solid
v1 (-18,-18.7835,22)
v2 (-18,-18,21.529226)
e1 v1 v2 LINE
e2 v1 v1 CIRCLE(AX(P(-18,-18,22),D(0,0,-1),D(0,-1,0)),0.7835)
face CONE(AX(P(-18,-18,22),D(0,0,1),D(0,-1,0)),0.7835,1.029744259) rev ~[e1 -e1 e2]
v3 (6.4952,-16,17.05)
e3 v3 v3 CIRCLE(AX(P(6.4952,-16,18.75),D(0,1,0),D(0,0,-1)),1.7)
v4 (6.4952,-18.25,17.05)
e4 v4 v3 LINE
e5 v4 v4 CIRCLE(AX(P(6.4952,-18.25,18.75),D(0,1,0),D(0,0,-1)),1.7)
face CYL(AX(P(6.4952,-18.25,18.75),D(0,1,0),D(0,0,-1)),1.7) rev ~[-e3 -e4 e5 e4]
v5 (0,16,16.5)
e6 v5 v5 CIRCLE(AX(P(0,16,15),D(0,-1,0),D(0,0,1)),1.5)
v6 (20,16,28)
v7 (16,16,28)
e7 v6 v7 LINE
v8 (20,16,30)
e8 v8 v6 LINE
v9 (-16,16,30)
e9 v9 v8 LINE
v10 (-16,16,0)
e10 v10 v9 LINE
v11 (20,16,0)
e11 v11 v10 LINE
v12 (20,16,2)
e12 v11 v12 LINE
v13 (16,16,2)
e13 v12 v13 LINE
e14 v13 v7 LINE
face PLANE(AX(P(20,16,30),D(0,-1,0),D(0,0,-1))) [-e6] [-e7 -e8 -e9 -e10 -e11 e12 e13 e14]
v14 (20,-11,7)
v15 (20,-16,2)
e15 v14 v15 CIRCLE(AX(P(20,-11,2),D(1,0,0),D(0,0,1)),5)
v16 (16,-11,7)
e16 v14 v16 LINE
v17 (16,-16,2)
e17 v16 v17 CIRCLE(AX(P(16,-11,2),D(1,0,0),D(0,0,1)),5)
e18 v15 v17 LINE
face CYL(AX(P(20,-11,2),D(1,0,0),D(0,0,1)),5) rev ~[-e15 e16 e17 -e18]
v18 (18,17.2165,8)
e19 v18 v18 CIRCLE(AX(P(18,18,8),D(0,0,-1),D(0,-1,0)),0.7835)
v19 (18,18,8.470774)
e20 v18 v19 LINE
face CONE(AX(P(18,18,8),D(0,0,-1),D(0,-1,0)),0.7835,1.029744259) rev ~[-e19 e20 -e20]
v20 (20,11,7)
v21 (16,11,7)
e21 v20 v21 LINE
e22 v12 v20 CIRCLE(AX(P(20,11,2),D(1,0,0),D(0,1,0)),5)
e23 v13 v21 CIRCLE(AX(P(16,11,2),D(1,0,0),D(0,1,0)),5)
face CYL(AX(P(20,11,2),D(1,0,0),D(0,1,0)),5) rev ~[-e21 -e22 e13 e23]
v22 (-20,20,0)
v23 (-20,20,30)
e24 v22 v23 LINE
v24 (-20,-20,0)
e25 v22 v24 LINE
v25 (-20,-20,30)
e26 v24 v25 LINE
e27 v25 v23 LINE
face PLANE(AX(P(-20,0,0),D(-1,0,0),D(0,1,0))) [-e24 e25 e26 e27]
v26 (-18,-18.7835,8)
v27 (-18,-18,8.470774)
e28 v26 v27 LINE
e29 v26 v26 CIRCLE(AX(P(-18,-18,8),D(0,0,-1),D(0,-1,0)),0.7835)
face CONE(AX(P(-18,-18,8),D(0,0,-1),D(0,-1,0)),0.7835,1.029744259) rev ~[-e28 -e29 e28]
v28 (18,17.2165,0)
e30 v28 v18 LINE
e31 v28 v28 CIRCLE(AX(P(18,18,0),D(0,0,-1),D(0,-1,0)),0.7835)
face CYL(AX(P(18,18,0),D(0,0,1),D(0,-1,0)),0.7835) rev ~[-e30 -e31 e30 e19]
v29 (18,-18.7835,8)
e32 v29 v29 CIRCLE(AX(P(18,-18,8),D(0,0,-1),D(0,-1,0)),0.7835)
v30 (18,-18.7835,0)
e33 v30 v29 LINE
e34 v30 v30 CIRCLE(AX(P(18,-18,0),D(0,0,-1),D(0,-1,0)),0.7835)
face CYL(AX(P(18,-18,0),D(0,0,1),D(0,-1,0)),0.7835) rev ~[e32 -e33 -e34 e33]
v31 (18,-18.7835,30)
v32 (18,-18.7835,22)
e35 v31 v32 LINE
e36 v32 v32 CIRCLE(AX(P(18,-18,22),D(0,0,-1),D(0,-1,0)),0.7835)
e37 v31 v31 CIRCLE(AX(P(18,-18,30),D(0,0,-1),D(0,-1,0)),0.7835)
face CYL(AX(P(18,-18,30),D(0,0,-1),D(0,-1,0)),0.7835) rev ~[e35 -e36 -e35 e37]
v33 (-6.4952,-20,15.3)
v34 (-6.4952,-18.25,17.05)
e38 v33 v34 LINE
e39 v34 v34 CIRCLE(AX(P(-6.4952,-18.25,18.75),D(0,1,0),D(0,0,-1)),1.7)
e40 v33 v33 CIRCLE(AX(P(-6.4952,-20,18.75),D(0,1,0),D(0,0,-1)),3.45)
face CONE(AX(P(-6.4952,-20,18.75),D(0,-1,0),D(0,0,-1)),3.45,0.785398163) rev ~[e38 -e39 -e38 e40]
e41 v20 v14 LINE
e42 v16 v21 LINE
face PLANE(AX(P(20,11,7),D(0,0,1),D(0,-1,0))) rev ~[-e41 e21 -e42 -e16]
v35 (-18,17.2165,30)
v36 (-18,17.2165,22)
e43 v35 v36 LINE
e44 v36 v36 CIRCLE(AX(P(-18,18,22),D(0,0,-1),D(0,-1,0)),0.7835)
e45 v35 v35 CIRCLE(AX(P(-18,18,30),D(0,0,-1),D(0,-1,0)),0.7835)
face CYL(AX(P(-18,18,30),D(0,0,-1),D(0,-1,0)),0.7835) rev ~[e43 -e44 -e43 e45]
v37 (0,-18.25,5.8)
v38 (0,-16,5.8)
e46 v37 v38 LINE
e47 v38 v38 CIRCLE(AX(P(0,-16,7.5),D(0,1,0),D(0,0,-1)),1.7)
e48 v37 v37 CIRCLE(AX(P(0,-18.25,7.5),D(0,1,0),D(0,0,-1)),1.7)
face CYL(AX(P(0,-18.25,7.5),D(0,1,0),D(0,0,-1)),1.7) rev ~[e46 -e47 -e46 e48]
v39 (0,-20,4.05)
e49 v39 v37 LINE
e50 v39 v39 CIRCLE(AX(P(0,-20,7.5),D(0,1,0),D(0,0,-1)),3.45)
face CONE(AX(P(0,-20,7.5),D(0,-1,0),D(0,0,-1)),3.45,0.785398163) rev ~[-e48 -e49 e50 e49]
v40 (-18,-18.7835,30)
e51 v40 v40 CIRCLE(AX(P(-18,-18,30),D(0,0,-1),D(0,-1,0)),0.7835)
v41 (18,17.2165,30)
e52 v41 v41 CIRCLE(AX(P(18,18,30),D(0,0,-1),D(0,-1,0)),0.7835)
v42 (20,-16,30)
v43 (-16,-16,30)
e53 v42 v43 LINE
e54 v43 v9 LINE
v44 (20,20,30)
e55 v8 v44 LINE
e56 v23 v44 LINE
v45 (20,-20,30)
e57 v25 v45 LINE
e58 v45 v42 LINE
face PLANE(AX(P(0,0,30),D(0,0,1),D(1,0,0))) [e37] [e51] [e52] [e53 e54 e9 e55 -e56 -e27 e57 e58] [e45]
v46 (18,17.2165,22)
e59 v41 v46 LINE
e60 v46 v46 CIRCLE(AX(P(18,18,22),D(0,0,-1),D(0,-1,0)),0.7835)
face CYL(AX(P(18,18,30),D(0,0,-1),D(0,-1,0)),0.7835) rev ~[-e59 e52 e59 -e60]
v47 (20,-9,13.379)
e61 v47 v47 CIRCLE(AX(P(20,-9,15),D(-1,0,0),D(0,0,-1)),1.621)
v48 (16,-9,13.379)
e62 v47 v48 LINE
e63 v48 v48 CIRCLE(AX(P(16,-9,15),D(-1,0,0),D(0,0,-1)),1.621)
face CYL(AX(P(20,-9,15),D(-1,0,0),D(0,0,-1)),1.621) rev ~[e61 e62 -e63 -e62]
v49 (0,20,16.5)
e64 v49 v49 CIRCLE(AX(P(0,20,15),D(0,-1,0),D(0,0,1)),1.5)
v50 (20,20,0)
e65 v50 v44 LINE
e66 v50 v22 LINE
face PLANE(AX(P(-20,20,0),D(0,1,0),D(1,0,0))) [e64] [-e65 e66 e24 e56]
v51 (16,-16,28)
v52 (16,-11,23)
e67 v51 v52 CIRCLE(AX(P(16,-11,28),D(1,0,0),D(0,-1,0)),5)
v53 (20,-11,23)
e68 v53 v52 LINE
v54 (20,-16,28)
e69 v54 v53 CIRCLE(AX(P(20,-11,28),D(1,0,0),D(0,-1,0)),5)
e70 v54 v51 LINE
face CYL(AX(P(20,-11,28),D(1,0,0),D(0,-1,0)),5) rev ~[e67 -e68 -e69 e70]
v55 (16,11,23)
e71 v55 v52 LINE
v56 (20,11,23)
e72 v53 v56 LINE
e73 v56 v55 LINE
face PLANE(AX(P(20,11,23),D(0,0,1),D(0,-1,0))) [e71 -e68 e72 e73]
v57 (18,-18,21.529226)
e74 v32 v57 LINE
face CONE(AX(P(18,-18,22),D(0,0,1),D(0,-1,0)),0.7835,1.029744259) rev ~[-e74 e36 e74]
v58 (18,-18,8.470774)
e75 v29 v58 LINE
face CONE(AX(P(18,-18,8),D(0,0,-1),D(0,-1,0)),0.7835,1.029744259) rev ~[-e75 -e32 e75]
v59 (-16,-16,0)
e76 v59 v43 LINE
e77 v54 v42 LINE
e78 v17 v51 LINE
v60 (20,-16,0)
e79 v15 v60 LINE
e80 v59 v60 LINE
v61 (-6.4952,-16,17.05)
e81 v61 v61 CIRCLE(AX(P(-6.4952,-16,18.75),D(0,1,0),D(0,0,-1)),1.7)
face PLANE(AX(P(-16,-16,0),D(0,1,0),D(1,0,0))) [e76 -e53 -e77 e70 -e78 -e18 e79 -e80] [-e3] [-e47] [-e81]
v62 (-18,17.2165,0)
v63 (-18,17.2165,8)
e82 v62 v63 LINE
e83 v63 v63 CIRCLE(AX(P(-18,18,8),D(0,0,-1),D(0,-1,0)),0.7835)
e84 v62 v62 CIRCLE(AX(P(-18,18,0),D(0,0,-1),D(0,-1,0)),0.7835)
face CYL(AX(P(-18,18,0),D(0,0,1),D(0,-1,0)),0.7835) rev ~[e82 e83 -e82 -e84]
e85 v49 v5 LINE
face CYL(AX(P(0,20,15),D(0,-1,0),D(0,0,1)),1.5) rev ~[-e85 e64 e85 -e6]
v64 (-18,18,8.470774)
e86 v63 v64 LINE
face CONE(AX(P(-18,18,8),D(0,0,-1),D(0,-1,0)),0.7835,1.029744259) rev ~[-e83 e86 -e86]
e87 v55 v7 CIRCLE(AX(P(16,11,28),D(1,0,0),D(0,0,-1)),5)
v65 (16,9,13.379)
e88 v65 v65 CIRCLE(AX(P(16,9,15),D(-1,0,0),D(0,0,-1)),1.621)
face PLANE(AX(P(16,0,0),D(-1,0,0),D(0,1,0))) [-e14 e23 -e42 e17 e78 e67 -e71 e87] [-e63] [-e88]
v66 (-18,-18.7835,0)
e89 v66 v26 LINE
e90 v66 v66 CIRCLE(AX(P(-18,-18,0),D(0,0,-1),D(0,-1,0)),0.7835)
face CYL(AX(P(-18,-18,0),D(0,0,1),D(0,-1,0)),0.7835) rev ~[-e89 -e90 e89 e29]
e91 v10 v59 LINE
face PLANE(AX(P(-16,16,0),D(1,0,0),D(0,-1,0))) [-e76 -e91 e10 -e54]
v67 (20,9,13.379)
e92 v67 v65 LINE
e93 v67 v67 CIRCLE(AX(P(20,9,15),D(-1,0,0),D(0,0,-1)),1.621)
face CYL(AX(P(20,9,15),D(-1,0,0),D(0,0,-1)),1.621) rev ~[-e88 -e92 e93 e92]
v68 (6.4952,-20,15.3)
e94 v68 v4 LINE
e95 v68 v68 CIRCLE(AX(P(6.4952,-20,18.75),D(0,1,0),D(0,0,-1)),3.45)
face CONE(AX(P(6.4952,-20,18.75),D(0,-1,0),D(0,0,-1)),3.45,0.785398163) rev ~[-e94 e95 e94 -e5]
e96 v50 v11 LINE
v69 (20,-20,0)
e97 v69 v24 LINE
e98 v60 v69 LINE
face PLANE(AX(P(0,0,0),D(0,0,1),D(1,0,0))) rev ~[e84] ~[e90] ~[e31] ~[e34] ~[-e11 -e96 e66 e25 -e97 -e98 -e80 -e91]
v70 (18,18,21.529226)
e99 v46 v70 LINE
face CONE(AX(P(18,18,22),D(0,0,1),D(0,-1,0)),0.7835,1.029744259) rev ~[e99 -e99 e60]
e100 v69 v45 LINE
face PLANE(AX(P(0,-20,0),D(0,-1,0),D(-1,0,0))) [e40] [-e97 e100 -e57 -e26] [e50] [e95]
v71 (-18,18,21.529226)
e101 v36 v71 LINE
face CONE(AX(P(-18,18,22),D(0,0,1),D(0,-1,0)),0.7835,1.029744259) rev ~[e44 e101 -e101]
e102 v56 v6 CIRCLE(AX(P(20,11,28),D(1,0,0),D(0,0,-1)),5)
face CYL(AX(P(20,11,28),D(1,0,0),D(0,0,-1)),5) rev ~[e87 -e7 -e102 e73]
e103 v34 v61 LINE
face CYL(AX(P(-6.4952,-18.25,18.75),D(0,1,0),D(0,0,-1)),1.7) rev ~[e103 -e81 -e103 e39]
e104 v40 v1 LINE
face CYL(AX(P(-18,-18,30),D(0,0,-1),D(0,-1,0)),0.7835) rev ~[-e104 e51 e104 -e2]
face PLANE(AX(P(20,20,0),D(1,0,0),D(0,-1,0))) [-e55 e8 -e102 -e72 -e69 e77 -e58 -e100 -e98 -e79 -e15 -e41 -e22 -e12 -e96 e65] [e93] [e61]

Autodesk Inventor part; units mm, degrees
ref_plane "YZ Plane" through (0, 0, 0) normal (1, 0, 0) x (0, 1, 0)
ref_plane "XZ Plane" through (0, 0, 0) normal (0, 1, 0) x (-1, 0, 0)
sketch "Skizze1" plane through (0, 0, 0) normal (0, 0, 1) x (1, 0, 0)
  line L0 (-20, 20) -> (20, 20)
  line L1 (20, 20) -> (20, -20)
  line L2 (20, -20) -> (-20, -20)
  line L3 (-20, -20) -> (-20, 20)
  line L4 (-28, 0) -> (28, 0) projected
  line L5 (0, -28) -> (0, 28) projected
  line L6 (16, 16) -> (-16, 16)
  line L7 (-16, 16) -> (-16, -16)
  line L8 (-16, -16) -> (16, -16)
  line L9 (16, -16) -> (16, 16)
  point P0 (0, 0)
  dimension "d0" = 40
  dimension "d1" = 4
extrude "Extrusion1" add sketch "Skizze1" along normal blind 30 contours L0 L5 L6 L7 L4 L3 | L0 L1 L4 L9 L6 L5 | L4 L7 L8 L5 L2 L3 | L1 L2 L5 L8 L9 L4
sketch "Skizze2" plane through (20, -20, 0) normal (1, 0, 0) x (0, 0, -1)
  line L0 (-30, 40) -> (-30, 0) projected
  line L1 (0, 0) -> (-30, 0) projected
  line L2 (0, 40) -> (-30, 40) projected
  line L3 (0, -8) -> (0, 48) projected
  line L4 (6, 20) -> (-36, 20) projected
  line L5 (-30, 36) -> (-28, 36)
  line L6 (-23, 31) -> (-23, 9)
  line L7 (-28, 4) -> (-30, 4)
  line L8 (-30, 4) -> (-30, 36)
  line L9 (0, 36) -> (-2, 36)
  line L10 (-7, 31) -> (-7, 9)
  line L11 (-2, 4) -> (0, 4)
  line L12 (0, 4) -> (0, 36)
  line L13 (-15, 40) -> (-15, 0)
  line L14 (0, 4) -> (-30, 4) projected
  arc A0 (-23, 31) -> (-28, 36) centre (-28, 31) ccw
  arc A1 (-28, 4) -> (-23, 9) centre (-28, 9) ccw
  arc A2 (-7, 9) -> (-2, 4) centre (-2, 9) ccw
  arc A3 (-2, 36) -> (-7, 31) centre (-2, 31) ccw
  point P0 (0, 20)
  dimension "d5" = 16
  dimension "d6" = 5
extrude "Extrusion2" cut sketch "Skizze2" against normal up to surface (4 mm away) contours L5 A0 L6 L4 L0 | L4 L6 A1 L7 L0 | L3 L4 L10 A3 L9 | L4 L3 L11 A2 L10
sketch "Skizze3" plane through (-20, -20, 0) normal (0, -1, 0) x (1, 0, 0)
  line L0 (40, 30) -> (0, 30) projected
  line L1 (0, 0) -> (0, 30) projected
  line L2 (40, 0) -> (40, 30) projected
  line L3 (20, 30) -> (20, 0)
  line L4 (0, 15) -> (40, 15)
  circle A0 centre (20, 15) radius 7.5
  line L5 (13.5048, 18.75) -> (20, 15)
  line L6 (20, 15) -> (26.4952, 18.75)
  point P0 (20, 7.5)
  dimension "d9" = 15
  dimension "d10" = 60
  dimension "d11" = 60
hole "Bohrung1" at (0, -20, 7.5) at (-6.4952, -20, 18.75) at (6.4952, -20, 18.75) direction (0, 1, 0) diameter 3.4 end up to surface countersink diameter 6.9 countersink angle 90
sketch "Skizze4" plane through (20, -20, 0) normal (1, 0, 0) x (0, 0, -1)
  circle A0 centre (-15, 29) radius 2.25 projected
  circle A1 centre (-15, 11) radius 2.25 projected
  point P0 (0, 20)
hole "Bohrung2" at (20, 9, 15) at (20, -9, 15) direction (-1, 0, 0) diameter 3.242 end up to surface thread size "M4x0.7" class "6H" standard "ISO Metric profile"
sketch "Skizze5" plane through (0, 0, 30) normal (0, 0, 1) x (1, 0, 0)
  line L0 (-20, 20) -> (20, 20) projected
  line L1 (-20, -20) -> (-20, 20) projected
  line L2 (20, -20) -> (-20, -20) projected
  line L3 (20, -16) -> (20, -20) projected
  line L4 (-18, 18) -> (18, 18)
  line L5 (18, 18) -> (18, -18)
  line L6 (18, -18) -> (-18, -18)
  line L7 (-18, -18) -> (-18, 18)
  point P0 (0, 0)
  dimension "d29" = 2
  dimension "d30" = 2
  dimension "d31" = 2
  dimension "d32" = 2
hole "Bohrung3" at (-18, 18, 30) at (18, 18, 30) at (18, -18, 30) at (-18, -18, 30) direction (0, 0, -1) diameter 1.567 depth 8 tip angle 118 thread size "M2x0.4" class "6H" standard "ISO Metric profile"
ref_plane "Arbeitsebene1" through (0, 0, 15) normal (0, 0, 1) x (1, 0, 0)
mirror "Spiegeln1" about plane through (0, 0, 15) normal (0, 0, 1) of "Bohrung3"
sketch "Skizze6" plane through (-20, 20, 0) normal (0, 1, 0) x (1, 0, 0)
  line L0 (0, -30) -> (40, -30) projected
  line L1 (40, 0) -> (40, -30) projected
  line L2 (0, 0) -> (0, -30) projected
  line L3 (0, -15) -> (40, -15)
  line L4 (20, 0) -> (20, -30)
  point P0 (20, -15)
hole "Bohrung4" at (0, 20, 15) direction (0, -1, 0) diameter 3 depth 8 tip angle 118
properties part number "13_0204_015"
